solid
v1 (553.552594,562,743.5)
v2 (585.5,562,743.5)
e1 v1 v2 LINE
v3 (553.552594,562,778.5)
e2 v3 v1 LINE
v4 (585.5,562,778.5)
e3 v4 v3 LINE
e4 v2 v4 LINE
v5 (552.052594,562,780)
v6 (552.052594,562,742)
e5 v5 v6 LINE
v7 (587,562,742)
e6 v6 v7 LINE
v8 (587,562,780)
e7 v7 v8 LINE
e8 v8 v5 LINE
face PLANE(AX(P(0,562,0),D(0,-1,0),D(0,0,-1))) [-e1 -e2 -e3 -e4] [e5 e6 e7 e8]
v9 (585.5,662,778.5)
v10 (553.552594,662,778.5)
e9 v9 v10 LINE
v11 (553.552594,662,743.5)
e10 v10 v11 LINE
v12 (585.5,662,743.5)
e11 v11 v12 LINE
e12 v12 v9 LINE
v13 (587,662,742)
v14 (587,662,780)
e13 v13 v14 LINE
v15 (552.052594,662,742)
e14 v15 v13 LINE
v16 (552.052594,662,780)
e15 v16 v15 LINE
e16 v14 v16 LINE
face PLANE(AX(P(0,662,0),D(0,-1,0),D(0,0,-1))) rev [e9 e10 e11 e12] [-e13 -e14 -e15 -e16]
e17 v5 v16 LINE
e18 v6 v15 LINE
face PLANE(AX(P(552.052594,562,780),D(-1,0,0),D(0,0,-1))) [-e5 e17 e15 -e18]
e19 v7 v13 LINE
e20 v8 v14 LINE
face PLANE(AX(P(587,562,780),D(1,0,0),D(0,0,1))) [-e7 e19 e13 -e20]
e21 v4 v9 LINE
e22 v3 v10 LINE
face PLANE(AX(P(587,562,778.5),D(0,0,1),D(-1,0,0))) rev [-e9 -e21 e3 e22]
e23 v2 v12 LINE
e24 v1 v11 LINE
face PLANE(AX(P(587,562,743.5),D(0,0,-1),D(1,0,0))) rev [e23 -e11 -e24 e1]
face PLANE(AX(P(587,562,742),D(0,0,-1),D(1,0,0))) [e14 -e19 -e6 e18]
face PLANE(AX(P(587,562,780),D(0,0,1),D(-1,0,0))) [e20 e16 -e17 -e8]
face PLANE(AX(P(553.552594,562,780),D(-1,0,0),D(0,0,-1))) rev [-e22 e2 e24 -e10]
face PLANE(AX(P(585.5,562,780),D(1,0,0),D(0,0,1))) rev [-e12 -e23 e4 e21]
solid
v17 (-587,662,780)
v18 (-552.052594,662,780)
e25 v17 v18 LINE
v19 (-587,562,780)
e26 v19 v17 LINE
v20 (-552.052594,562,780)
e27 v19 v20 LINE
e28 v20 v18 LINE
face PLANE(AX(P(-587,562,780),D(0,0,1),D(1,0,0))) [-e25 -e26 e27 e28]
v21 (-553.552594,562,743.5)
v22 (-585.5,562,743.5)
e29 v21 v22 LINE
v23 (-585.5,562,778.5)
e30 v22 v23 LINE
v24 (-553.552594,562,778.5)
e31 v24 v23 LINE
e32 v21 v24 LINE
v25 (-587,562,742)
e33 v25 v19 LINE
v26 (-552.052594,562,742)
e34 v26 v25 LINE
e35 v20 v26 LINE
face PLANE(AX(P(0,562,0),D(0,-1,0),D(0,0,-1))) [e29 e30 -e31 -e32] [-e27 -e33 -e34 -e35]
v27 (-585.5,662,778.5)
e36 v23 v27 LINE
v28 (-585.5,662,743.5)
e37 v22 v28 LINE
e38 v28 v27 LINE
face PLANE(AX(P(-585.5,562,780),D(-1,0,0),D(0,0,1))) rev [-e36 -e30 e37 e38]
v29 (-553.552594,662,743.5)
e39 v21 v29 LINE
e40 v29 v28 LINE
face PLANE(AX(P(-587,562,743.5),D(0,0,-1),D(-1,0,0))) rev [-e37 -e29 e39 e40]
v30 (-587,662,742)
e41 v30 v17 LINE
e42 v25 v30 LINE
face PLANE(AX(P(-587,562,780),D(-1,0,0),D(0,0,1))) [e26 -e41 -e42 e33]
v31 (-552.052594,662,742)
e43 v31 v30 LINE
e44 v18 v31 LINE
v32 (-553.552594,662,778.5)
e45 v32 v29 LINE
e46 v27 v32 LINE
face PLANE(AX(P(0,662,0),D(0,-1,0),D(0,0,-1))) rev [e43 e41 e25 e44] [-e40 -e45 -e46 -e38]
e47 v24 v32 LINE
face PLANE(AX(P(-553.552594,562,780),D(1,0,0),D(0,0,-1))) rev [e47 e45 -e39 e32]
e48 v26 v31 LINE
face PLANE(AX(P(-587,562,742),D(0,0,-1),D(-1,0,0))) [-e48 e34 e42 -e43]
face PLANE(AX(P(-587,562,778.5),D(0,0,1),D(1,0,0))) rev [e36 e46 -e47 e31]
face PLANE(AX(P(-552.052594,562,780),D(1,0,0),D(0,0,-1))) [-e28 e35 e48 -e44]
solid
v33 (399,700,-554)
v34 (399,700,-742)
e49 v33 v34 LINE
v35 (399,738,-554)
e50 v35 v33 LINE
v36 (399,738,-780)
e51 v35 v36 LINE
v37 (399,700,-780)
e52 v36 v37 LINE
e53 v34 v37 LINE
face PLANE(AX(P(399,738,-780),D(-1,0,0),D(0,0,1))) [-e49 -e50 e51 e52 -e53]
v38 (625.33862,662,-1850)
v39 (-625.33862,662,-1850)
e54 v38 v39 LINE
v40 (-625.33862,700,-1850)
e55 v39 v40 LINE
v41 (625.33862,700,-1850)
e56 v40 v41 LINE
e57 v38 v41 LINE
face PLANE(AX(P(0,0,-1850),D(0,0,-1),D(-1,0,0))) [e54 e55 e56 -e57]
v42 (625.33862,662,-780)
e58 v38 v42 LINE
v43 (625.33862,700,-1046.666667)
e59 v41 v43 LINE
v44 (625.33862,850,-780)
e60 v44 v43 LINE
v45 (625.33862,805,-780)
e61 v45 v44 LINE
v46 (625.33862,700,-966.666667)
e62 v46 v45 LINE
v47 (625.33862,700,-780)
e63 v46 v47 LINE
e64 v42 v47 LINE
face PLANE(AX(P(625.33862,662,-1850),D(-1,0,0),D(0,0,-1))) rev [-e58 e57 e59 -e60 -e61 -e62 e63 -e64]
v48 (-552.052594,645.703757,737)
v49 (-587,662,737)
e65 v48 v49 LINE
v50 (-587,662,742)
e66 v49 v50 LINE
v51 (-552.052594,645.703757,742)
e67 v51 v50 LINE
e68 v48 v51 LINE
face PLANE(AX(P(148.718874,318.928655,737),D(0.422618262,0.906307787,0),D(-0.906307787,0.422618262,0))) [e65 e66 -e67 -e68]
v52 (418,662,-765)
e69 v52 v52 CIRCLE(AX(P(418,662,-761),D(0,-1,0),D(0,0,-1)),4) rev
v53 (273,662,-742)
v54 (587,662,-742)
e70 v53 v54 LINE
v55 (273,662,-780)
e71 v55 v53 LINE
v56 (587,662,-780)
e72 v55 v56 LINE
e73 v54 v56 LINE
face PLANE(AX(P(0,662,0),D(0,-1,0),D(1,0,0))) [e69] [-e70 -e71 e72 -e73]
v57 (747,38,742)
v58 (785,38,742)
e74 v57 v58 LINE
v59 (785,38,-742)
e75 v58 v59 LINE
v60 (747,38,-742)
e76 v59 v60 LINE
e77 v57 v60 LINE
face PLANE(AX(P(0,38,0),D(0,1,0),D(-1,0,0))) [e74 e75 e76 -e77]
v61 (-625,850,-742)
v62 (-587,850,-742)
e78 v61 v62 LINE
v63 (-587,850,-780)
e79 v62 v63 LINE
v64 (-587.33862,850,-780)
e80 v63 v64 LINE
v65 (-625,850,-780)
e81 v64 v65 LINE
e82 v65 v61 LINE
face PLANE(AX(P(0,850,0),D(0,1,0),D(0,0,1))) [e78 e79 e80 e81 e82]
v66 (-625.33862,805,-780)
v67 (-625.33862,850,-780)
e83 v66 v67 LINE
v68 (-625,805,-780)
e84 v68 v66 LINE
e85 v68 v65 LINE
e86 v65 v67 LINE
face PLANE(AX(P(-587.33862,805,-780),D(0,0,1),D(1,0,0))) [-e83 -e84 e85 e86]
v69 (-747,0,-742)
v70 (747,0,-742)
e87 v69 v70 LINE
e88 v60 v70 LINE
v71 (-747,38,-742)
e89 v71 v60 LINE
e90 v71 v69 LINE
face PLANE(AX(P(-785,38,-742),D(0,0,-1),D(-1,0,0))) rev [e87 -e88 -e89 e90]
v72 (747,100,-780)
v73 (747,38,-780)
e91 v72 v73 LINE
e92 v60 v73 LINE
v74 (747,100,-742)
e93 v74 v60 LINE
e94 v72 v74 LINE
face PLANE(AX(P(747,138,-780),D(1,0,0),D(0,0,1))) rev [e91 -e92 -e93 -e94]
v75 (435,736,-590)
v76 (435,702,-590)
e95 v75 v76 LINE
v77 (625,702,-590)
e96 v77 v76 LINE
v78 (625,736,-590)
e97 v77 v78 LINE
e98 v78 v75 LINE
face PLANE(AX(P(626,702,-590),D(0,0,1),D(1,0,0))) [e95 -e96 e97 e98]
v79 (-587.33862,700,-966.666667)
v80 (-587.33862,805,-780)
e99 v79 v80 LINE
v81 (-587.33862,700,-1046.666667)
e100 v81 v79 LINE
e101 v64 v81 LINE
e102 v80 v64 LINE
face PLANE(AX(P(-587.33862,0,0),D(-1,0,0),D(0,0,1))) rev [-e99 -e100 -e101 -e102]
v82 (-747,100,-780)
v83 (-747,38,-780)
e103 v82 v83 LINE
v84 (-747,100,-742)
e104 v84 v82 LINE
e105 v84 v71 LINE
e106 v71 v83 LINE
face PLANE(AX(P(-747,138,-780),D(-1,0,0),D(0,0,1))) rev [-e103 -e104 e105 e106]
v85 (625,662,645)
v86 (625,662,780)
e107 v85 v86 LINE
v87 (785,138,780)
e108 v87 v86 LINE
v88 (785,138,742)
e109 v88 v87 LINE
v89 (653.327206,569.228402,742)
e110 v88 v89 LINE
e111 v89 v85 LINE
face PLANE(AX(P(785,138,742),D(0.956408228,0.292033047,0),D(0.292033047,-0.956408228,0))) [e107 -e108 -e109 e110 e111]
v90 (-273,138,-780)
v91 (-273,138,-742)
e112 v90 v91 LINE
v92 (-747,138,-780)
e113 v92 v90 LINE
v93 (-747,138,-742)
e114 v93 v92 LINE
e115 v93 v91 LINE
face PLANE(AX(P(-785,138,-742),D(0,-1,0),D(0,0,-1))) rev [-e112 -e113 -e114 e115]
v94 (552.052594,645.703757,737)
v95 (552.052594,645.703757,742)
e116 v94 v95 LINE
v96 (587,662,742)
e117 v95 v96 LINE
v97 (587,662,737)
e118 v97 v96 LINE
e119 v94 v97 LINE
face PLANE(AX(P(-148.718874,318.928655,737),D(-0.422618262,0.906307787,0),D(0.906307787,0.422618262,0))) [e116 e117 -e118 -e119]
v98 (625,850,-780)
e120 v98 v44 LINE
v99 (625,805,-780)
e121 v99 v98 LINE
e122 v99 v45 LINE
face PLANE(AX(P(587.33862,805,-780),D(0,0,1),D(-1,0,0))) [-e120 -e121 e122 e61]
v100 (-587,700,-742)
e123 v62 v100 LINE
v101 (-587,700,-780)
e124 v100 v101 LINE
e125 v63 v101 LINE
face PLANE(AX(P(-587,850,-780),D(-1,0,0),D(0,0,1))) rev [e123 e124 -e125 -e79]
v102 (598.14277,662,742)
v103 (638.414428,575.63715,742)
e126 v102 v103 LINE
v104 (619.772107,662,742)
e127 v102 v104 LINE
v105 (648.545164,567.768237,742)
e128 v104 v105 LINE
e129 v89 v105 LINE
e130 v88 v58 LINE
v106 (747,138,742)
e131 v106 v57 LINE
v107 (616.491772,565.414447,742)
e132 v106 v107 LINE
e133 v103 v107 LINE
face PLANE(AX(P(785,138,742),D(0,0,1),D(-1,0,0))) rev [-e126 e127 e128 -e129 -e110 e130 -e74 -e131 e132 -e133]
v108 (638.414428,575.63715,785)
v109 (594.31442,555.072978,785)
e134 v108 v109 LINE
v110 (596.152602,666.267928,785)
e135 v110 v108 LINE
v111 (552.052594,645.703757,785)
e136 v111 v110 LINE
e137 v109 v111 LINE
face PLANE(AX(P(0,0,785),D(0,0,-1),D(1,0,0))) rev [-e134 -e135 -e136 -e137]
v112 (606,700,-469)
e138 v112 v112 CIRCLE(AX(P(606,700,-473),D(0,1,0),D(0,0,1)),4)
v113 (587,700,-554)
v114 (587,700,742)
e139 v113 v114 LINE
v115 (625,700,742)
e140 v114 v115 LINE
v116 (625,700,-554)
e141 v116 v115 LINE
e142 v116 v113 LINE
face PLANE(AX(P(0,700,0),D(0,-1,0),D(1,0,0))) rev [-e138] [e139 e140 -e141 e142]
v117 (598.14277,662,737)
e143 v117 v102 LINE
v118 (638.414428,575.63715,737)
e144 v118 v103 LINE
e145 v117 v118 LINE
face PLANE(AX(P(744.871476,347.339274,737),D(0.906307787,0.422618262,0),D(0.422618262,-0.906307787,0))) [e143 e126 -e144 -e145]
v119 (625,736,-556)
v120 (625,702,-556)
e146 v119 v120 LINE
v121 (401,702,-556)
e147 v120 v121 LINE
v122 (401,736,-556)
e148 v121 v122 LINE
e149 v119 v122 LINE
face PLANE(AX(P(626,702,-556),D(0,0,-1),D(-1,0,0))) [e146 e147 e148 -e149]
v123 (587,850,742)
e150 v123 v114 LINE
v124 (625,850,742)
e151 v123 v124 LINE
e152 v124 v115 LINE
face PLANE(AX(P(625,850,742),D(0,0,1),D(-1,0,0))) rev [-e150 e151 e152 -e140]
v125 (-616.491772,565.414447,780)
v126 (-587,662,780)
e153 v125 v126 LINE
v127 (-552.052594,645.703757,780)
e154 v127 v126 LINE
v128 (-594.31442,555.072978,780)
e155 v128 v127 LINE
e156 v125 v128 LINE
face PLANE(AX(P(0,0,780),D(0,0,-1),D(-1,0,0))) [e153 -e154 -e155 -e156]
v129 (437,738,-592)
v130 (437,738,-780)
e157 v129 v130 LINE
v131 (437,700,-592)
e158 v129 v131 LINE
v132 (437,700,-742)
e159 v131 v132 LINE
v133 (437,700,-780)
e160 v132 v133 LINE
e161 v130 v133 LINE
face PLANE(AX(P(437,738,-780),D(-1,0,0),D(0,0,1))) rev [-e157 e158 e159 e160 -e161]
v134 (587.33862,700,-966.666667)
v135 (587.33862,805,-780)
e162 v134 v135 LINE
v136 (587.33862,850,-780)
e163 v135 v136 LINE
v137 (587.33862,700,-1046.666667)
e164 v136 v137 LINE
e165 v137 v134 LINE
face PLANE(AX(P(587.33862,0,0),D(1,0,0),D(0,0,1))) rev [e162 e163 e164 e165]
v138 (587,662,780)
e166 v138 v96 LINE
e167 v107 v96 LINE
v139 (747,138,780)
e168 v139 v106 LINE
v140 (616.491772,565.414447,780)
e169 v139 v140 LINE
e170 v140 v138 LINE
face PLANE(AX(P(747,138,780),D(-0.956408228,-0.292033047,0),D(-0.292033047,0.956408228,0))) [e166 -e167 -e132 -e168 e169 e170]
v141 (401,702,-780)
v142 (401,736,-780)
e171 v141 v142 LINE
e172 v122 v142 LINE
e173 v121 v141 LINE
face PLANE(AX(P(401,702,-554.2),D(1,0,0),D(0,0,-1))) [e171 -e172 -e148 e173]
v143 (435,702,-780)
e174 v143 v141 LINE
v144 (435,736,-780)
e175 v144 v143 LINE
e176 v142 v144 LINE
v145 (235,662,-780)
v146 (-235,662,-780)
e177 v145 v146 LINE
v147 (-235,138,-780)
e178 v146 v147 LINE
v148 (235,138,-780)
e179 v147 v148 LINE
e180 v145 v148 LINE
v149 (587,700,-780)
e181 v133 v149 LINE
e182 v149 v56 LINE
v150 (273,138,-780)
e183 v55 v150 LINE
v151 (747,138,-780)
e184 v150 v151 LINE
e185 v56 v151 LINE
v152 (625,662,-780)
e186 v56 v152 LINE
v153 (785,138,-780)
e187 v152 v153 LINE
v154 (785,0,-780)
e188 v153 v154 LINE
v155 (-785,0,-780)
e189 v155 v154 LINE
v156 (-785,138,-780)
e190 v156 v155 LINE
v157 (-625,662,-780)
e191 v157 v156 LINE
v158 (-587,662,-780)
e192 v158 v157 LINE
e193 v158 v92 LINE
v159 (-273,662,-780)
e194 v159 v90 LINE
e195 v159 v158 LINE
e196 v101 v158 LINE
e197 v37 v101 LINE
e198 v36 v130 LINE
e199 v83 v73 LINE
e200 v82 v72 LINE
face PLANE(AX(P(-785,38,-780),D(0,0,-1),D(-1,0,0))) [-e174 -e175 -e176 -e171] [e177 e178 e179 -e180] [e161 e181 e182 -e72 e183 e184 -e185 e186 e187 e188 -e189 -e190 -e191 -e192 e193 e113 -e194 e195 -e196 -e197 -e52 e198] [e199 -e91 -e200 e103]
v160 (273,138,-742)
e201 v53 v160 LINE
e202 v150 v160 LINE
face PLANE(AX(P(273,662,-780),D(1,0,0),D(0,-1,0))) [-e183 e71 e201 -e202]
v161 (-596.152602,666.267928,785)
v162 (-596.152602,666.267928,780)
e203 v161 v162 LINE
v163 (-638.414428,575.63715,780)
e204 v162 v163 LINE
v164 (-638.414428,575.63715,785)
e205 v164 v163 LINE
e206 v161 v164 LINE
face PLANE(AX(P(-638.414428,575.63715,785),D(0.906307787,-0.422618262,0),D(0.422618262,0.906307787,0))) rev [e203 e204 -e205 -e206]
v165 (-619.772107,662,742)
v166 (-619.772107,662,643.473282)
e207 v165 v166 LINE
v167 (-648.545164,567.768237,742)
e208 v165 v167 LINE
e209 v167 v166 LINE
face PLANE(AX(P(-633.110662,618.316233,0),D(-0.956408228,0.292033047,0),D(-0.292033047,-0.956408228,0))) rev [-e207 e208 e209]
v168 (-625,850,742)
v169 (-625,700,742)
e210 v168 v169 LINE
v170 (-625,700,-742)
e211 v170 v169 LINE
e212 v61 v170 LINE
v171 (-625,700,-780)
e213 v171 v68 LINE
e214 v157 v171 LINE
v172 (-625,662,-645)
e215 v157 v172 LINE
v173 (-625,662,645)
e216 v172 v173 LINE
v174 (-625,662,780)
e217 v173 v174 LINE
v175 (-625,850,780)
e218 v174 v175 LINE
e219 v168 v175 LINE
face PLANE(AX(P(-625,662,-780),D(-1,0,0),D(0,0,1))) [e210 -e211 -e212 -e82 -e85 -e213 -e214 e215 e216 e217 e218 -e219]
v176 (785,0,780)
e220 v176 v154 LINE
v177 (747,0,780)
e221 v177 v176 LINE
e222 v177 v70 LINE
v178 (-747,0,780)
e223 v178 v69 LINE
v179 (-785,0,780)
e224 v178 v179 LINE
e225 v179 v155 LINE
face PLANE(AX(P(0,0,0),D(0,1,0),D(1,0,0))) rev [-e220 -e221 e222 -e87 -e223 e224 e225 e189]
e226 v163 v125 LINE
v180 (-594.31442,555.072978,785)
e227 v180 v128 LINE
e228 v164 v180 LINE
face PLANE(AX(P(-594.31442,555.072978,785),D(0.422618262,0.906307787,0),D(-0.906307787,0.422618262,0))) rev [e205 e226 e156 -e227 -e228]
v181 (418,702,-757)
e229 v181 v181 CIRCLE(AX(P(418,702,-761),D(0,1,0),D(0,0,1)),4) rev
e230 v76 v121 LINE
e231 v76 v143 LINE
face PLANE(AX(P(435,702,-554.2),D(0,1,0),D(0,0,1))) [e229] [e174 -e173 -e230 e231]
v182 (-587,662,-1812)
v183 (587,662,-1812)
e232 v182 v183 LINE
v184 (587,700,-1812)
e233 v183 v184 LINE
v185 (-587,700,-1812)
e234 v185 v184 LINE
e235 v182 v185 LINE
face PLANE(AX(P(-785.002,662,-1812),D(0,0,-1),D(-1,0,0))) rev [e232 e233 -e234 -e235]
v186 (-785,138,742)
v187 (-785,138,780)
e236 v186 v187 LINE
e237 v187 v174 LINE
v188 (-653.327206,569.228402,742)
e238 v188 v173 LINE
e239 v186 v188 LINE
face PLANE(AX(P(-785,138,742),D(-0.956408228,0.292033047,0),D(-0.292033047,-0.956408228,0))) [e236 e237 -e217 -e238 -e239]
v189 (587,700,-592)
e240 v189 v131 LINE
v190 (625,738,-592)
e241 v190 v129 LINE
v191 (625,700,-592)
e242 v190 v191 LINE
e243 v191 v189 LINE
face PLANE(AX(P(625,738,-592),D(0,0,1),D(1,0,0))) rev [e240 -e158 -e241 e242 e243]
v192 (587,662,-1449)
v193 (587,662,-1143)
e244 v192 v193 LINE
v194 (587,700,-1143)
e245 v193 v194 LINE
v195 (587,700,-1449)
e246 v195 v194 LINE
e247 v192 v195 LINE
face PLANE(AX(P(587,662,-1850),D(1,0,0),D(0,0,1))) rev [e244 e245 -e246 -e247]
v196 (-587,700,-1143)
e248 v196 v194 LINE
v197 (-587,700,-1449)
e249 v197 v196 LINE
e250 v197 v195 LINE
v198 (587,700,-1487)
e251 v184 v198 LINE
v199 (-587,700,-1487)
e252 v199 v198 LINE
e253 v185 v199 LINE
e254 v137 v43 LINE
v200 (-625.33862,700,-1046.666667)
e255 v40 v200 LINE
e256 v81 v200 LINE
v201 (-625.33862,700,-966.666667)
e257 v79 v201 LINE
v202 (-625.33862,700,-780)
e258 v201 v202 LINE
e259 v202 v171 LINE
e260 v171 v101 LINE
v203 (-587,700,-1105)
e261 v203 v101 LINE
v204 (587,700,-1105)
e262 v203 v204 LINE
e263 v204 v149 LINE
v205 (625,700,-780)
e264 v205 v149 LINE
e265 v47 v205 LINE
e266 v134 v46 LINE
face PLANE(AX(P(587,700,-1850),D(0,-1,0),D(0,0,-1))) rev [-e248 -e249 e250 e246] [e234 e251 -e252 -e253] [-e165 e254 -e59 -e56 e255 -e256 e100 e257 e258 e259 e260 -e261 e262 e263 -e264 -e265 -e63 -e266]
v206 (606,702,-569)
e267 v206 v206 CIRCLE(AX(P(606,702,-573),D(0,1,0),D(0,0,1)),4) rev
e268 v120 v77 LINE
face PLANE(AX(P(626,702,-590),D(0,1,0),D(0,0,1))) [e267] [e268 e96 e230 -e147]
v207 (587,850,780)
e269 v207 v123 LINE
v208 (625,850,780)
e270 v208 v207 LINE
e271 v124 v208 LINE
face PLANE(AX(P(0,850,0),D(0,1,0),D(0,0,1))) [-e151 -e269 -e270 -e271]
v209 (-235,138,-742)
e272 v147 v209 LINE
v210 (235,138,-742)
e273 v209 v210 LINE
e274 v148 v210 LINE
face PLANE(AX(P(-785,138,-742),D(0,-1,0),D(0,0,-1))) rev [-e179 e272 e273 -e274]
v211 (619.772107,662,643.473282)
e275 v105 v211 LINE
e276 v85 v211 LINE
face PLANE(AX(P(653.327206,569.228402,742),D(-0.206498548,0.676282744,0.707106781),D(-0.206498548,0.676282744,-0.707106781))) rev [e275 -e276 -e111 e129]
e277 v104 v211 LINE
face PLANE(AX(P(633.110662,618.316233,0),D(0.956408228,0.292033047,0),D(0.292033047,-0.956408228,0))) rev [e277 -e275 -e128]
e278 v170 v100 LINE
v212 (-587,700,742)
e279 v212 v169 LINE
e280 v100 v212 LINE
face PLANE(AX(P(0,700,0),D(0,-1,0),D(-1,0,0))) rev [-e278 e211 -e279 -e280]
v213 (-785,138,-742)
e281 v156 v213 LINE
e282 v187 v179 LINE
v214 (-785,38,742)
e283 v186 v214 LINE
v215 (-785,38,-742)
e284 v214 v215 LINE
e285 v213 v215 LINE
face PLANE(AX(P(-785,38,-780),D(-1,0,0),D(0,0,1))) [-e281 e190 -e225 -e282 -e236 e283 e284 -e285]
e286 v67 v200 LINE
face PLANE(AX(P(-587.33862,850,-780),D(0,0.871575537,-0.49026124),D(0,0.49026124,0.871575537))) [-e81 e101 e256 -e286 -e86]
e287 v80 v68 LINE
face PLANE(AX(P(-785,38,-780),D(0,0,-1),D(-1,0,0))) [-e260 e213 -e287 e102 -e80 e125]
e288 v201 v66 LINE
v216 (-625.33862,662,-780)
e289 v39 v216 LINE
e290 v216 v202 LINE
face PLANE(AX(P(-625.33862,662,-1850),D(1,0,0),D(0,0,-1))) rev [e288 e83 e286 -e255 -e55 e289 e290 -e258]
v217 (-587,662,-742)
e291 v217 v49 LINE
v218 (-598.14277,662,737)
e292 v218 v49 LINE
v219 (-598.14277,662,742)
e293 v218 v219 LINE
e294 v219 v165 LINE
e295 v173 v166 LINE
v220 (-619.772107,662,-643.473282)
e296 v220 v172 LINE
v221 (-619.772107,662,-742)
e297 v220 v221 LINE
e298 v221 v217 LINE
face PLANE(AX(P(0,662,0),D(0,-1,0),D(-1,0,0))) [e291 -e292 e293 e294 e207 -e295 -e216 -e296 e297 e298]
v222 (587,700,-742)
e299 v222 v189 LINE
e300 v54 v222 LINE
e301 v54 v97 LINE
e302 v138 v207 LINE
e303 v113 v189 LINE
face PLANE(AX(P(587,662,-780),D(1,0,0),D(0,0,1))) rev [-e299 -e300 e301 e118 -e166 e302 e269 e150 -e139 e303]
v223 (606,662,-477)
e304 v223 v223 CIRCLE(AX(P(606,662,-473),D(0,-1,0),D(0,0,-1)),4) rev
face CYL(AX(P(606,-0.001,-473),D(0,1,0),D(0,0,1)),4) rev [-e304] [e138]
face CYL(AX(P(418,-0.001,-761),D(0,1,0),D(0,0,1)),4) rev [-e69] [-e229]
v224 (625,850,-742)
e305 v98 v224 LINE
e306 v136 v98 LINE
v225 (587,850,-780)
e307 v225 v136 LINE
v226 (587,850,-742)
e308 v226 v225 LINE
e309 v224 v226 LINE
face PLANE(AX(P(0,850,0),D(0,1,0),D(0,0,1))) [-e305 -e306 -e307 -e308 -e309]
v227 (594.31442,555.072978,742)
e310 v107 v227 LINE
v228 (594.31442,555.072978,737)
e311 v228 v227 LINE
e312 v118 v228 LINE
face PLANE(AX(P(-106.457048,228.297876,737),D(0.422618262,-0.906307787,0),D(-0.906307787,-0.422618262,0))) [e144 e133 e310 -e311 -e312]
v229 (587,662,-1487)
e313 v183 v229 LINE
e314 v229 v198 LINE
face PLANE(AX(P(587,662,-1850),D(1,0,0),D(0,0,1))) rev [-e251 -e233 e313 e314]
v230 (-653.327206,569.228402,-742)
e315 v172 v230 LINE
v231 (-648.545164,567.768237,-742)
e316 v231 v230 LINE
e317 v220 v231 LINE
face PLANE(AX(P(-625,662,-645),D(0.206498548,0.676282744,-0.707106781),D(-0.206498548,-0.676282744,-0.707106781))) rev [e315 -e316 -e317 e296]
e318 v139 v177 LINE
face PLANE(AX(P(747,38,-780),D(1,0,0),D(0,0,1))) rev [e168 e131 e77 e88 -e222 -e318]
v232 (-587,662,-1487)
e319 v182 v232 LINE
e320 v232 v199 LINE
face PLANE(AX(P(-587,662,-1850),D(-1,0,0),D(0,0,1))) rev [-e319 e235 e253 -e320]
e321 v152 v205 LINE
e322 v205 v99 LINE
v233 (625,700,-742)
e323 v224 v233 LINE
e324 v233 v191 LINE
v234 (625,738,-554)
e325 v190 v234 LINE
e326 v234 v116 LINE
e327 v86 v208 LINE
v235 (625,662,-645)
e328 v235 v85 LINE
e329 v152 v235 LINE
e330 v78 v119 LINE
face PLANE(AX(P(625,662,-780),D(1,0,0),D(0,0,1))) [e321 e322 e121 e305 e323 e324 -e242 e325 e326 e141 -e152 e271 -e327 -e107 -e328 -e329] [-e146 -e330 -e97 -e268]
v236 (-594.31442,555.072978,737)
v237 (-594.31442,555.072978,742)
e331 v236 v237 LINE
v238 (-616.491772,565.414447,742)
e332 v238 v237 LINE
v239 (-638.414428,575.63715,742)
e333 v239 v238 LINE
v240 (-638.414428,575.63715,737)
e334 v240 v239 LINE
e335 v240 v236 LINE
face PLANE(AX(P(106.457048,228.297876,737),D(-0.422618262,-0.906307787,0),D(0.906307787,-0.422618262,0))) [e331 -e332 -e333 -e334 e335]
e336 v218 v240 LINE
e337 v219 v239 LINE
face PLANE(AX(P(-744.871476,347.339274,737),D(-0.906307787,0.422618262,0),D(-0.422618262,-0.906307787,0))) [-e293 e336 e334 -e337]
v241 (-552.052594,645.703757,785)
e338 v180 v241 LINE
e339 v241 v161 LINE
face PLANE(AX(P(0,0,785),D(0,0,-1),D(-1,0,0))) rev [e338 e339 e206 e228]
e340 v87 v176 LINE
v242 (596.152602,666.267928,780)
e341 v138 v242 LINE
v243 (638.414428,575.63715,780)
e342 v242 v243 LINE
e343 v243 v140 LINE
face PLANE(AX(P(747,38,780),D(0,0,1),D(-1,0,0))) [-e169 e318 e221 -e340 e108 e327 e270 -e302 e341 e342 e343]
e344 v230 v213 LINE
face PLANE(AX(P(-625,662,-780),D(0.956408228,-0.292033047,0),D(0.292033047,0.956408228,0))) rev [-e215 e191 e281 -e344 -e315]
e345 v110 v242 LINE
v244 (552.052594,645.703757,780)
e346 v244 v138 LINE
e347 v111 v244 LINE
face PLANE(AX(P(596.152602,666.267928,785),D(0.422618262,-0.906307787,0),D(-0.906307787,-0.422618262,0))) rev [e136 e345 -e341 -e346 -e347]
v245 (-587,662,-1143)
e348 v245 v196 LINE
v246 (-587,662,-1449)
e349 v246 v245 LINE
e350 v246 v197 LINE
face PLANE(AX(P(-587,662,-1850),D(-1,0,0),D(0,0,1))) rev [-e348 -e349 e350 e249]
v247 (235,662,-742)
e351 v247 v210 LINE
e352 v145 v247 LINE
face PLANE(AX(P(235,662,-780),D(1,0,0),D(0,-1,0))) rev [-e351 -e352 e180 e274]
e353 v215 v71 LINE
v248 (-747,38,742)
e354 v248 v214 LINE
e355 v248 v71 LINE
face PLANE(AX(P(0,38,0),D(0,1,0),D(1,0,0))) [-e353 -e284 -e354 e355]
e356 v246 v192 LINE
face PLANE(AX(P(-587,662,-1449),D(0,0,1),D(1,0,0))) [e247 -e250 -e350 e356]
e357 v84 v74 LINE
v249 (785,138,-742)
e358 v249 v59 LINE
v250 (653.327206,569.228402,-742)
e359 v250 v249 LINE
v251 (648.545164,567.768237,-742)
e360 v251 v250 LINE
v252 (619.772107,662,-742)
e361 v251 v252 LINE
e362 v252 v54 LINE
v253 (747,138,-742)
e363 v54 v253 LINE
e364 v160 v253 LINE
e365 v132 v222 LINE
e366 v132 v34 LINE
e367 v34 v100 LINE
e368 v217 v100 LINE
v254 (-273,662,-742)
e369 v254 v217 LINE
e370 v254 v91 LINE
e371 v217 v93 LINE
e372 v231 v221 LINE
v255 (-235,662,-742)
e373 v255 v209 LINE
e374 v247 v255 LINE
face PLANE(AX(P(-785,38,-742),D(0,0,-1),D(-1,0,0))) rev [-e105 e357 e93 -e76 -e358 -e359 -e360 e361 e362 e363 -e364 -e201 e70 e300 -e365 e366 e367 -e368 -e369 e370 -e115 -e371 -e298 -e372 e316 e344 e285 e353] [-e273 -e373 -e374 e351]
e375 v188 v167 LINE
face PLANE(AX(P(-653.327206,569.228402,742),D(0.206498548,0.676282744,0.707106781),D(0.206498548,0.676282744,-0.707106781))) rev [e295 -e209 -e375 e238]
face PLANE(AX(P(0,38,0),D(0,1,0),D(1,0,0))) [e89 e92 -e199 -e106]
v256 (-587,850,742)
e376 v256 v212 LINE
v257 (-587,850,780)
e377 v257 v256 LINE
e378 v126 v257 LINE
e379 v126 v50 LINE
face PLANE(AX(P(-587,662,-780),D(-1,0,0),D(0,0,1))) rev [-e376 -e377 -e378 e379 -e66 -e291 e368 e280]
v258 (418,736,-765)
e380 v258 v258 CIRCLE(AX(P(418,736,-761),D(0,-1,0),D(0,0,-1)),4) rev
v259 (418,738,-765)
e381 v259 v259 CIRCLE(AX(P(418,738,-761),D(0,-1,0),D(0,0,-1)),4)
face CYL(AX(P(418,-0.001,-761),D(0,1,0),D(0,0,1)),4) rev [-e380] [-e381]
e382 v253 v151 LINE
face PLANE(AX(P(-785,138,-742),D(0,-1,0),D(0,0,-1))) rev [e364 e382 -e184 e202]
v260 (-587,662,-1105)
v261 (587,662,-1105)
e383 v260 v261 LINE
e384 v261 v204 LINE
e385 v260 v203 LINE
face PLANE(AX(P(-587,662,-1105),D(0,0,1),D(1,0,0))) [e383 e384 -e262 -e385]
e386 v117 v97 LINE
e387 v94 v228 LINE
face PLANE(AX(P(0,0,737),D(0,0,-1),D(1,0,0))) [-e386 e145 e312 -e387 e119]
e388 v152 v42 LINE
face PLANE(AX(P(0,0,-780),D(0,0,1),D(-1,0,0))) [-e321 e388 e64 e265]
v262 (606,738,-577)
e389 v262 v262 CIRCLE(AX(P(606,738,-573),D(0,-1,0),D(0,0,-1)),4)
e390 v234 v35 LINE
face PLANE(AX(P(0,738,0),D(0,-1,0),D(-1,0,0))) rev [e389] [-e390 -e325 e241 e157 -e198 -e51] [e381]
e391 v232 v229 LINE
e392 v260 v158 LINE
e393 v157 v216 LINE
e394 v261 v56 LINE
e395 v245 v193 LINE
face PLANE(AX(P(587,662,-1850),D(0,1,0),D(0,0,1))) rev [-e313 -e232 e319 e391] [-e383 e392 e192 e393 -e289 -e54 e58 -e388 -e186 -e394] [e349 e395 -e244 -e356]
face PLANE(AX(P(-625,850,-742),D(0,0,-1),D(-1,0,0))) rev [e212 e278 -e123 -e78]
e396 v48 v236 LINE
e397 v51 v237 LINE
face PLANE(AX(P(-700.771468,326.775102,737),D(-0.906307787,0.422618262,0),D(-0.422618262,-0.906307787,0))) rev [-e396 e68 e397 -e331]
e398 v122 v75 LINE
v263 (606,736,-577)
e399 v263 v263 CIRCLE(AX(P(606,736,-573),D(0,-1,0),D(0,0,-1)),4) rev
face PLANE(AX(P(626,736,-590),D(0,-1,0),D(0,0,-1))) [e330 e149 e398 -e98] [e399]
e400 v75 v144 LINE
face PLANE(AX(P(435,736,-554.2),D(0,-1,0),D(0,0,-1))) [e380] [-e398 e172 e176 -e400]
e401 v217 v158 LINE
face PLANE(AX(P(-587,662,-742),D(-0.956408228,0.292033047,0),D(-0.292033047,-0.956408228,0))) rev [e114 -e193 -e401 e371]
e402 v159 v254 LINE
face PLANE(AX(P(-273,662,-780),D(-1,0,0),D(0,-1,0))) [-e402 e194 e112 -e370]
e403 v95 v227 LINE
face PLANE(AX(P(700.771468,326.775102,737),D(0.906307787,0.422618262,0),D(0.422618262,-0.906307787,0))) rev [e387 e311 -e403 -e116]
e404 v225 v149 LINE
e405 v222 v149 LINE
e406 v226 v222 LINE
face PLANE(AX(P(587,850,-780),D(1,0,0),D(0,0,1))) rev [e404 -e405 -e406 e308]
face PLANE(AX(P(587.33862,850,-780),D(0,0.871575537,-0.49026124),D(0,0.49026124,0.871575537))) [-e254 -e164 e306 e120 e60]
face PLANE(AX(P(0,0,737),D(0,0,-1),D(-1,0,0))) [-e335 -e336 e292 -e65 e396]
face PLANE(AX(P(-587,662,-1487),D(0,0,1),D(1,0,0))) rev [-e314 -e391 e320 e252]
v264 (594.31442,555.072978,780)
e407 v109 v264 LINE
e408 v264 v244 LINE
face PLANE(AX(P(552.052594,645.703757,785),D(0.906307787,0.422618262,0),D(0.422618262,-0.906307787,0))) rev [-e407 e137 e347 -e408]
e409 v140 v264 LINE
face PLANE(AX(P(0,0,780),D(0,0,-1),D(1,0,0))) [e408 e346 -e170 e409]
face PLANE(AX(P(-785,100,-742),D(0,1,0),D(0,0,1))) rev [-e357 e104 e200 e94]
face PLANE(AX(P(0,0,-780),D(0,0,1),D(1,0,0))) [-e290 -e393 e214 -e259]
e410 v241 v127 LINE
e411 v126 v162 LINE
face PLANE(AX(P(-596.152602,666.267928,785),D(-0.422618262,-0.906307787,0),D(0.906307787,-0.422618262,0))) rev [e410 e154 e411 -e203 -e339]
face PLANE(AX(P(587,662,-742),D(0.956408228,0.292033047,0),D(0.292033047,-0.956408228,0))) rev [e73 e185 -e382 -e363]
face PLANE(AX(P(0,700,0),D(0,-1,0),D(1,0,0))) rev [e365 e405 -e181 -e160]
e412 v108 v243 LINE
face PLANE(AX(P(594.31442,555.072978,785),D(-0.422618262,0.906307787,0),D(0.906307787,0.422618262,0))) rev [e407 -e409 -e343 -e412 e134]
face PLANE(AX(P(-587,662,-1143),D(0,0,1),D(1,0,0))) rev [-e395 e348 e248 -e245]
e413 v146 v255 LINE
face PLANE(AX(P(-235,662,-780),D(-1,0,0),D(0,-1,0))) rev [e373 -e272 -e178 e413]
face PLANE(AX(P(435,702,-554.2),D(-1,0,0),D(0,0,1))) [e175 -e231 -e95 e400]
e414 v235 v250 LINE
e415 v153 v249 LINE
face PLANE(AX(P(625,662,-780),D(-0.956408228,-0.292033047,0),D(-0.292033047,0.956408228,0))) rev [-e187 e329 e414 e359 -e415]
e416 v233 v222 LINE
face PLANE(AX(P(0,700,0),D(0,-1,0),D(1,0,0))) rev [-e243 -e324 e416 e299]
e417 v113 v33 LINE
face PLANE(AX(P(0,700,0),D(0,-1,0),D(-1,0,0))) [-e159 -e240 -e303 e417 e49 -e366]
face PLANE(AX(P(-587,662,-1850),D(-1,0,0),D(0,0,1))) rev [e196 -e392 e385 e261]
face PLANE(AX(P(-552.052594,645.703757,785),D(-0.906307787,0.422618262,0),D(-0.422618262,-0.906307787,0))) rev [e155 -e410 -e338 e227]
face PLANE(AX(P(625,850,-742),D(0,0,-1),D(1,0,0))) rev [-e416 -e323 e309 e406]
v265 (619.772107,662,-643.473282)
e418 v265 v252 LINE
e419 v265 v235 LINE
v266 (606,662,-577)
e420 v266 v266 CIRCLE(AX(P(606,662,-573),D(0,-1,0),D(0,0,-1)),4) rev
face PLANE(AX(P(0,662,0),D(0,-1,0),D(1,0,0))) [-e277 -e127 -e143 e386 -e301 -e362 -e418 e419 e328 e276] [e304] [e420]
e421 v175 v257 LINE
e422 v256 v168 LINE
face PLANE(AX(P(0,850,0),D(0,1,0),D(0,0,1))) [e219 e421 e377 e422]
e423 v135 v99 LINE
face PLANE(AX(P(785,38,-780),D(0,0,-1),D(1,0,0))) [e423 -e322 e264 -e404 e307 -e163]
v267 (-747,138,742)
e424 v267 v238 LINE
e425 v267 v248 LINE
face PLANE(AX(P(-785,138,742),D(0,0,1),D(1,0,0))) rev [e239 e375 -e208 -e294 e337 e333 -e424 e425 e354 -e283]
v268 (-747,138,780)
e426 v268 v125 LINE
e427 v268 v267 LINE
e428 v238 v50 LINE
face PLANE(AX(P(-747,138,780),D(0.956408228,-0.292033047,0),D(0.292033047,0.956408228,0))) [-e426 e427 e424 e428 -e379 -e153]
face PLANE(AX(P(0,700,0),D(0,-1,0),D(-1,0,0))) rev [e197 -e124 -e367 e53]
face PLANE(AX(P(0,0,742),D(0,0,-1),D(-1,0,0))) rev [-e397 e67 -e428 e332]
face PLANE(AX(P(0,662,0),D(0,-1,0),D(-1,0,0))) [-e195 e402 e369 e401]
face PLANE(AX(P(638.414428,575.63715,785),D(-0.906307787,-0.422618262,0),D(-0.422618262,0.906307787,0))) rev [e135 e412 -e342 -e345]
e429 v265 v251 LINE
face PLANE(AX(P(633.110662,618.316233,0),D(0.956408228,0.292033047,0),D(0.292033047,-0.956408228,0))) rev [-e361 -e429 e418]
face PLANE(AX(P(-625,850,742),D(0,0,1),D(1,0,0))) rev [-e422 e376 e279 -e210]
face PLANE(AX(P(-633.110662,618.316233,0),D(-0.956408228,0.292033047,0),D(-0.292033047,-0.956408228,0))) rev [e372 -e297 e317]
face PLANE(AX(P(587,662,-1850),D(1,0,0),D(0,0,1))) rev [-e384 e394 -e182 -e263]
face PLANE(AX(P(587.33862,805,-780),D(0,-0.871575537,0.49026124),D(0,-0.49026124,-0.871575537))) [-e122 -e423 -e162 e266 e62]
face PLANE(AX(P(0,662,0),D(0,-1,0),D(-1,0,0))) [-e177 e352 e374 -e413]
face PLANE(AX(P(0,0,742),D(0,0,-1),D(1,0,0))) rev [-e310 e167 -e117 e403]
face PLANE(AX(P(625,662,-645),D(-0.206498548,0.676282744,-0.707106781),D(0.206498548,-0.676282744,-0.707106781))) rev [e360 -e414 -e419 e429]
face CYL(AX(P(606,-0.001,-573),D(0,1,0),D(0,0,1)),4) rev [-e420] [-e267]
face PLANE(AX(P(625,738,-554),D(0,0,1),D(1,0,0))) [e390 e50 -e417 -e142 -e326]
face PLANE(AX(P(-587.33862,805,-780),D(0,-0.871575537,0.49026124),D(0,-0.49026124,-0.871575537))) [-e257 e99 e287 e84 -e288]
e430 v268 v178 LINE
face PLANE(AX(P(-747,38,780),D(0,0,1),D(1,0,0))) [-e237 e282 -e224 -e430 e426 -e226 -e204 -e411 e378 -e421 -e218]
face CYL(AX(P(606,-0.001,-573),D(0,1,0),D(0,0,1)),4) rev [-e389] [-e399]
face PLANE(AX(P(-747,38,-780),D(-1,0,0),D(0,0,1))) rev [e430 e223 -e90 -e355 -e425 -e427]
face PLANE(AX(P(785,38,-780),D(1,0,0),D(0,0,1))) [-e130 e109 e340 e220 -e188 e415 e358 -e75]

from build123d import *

# Parameters (mm, degrees)
EXTRUDE_THIN1_DEPTH  = 38
SKETCH3_W            = 38
SKETCH3_H            = 38
BOSS_EXTRUDE1_DEPTH  = 100
EXTRUDE_THIN2_DEPTH  = 38
SWEEP1_START         = 742
SWEEP1_DEPTH         = 38
SWEEP2_START         = 742
SWEEP2_DEPTH         = 38
SWEEP3_START         = -780
SWEEP3_DEPTH         = 38
SWEEP4_START         = -780
SWEEP4_DEPTH         = 38
SKETCH13_W           = 38
SKETCH13_H           = 38
BOSS_EXTRUDE2_DEPTH  = 150
RIB1_REACH           = 1837.226
SKETCH16_WALL_W      = 3809.630165696
SKETCH16_WALL_H      = 5
RIB2_REACH           = 1837.226
SKETCH21_WALL_W      = 3809.630165696
SKETCH21_WALL_H      = 5
SKETCH25_W           = 935.216872936
SKETCH25_H           = 953.548523314
CUT_EXTRUDE1_DEPTH   = 1943.247409575
SKETCH26_W           = 38
SKETCH26_H           = 38
SKETCH26_W_2         = 38.33862028
BOSS_EXTRUDE3_DEPTH  = 1070
BOSS_EXTRUDE4_REACH  = 2457.073
SKETCH27_W           = 38
SKETCH27_H           = 38
BOSS_EXTRUDE5_DEPTH  = 38
SKETCH29_W           = 38
SKETCH29_H           = 624
EXTRUDE_THIN3_DEPTH  = 38
SKETCH30_W           = 38
SKETCH30_H           = 624
EXTRUDE_THIN4_DEPTH  = 38
SKETCH31_W           = 1174
SKETCH31_H           = 38
EXTRUDE_THIN5_DEPTH  = 38
BOSS_EXTRUDE6_DEPTH  = 38
BOSS_EXTRUDE7_DEPTH  = 5
BOSS_EXTRUDE8_DEPTH  = 5
SKETCH35_W           = 34.947405688
SKETCH35_H           = 38
BOSS_EXTRUDE11_DEPTH = 100
SHELL1_T             = -1.5
SKETCH36_W           = 943.118643106
SKETCH36_H           = 1032.640089362
CUT_EXTRUDE2_DEPTH   = 2878.837729963
SKETCH38_R           = 4
CUT_EXTRUDE3_DEPTH   = 38
SKETCH40_W           = 31.947405688
SKETCH40_H           = 35
CUT_EXTRUDE5_DEPTH   = 2087.760407905
SKETCH41_W           = 31.947405688
SKETCH41_H           = 35
CUT_EXTRUDE6_DEPTH   = 2087.760407905
EXTRUDE_THIN7_DEPTH  = 38
SKETCH43_R           = 4
CUT_EXTRUDE7_DEPTH   = 2116.884921256
SKETCH45_W           = 34
SKETCH45_H           = 34
SKETCH49_W           = 38
SKETCH49_H           = 38
BOSS_EXTRUDE12_DEPTH = 1494
SKETCH50_W           = 38
SKETCH50_H           = 62
CUT_EXTRUDE8_DEPTH   = 1916.842895438


# Read off the part's stored shape, not the designer's step: Sweep1, Sweep2, Sweep3, Sweep4
with BuildPart() as part:
    # Sketch2 → Extrude-Thin1 (new body)
    with BuildSketch(Plane(origin=(0, 0, 0), x_dir=(1, 0, 0), z_dir=(0, 1, 0))):
        Polygon((785, -780), (785, 780), (-785, 780), (-785, -780), (-747, -780), (-747, 742), (747, 742), (747, -780), align=None)
    extrude(amount=EXTRUDE_THIN1_DEPTH)

    # Sketch3 → Boss-Extrude1 (add)
    with BuildSketch(Plane(origin=(0, 38, 0), x_dir=(1, 0, 0), z_dir=(0, 1, 0))):
        with Locations((-766, 761)):
            Rectangle(SKETCH3_W, SKETCH3_H)
        with Locations((766, 761)):
            Rectangle(SKETCH3_W, SKETCH3_H)
        with Locations((766, -761)):
            Rectangle(SKETCH3_W, SKETCH3_H)
        with Locations((-766, -761)):
            Rectangle(SKETCH3_W, SKETCH3_H)
    extrude(amount=BOSS_EXTRUDE1_DEPTH)



with BuildPart() as body_2:
    # Sketch4 → Extrude-Thin2 (new body)
    with BuildSketch(Plane(origin=(0, 700, 0), x_dir=(1, 0, 0), z_dir=(0, 1, 0))):
        Polygon((625, -780), (625, 780), (-625, 780), (-625, -780), (-587, -780), (-587, 742), (587, 742), (587, -780), align=None)
    extrude(amount=-EXTRUDE_THIN2_DEPTH)


with BuildPart() as part_1:
    add(part.part)

    add(body_2.part)  # Sweep1 merges body 2
    # Sweep1 outline → Sweep1 (add)
    with BuildSketch(Plane.XY.offset(SWEEP1_START)):
        Polygon((-587, 662), (-625, 662), (-785, 138), (-747, 138), align=None)
    extrude(amount=SWEEP1_DEPTH)

    # Sweep2 outline → Sweep2 (add)
    with BuildSketch(Plane.XY.offset(SWEEP2_START)):
        Polygon((747, 138), (785, 138), (625, 662), (587, 662), align=None)
    extrude(amount=SWEEP2_DEPTH)

    # Sweep3 outline → Sweep3 (add)
    with BuildSketch(Plane.XY.offset(SWEEP3_START)):
        Polygon((785, 138), (625, 662), (587, 662), (747, 138), align=None)
    extrude(amount=SWEEP3_DEPTH)

    # Sweep4 outline → Sweep4 (add)
    with BuildSketch(Plane.XY.offset(SWEEP4_START)):
        Polygon((-625, 662), (-785, 138), (-747, 138), (-587, 662), align=None)
    extrude(amount=SWEEP4_DEPTH)

    # Sketch13 → Boss-Extrude2 (add)
    with BuildSketch(Plane(origin=(0, 700, 0), x_dir=(1, 0, 0), z_dir=(0, 1, 0))):
        with Locations((-606, 761)):
            Rectangle(SKETCH13_W, SKETCH13_H)
        with Locations((-606, -761)):
            Rectangle(SKETCH13_W, SKETCH13_H)
        with Locations((606, 761)):
            Rectangle(SKETCH13_W, SKETCH13_H)
        with Locations((606, -761)):
            Rectangle(SKETCH13_W, SKETCH13_H)
    extrude(amount=BOSS_EXTRUDE2_DEPTH)

    # Sketch16 wall → Rib1 (add, up to next)
    with BuildSketch(Plane(origin=(-639.163602773, 615.614200918, 693.5), x_dir=(0.20649854777, 0.676282743952, -0.707106781188), z_dir=(-0.206498547772, -0.676282743954, -0.707106781186)), mode=Mode.PRIVATE) as rib1_sk1:
        with Locations((0, 2.5)):
            Rectangle(SKETCH16_WALL_W, SKETCH16_WALL_H)
    rib1_tool1 = extrude(rib1_sk1.sketch, amount=-RIB1_REACH, mode=Mode.PRIVATE) - part_1.part
    add(rib1_tool1.solids().sort_by_distance((-639.163602773, 615.614200918, 693.5))[0])

    # Sketch21 wall → Rib2 (add, up to next)
    with BuildSketch(Plane(origin=(-639.163602773, 615.614200918, -693.5), x_dir=(-0.20649854777, -0.676282743952, -0.707106781188), z_dir=(-0.206498547772, -0.676282743954, 0.707106781186)), mode=Mode.PRIVATE) as rib2_sk1:
        with Locations((0, 2.5)):
            Rectangle(SKETCH21_WALL_W, SKETCH21_WALL_H)
    rib2_tool1 = extrude(rib2_sk1.sketch, amount=-RIB2_REACH, mode=Mode.PRIVATE) - part_1.part
    add(rib2_tool1.solids().sort_by_distance((-639.163602773, 615.614200918, -693.5))[0])

    # Sketch25 → Cut-Extrude1 (cut, through all)
    with BuildSketch(Plane.XY.offset(780)):
        with Locations((467.608436468, 476.774261657)):
            Rectangle(SKETCH25_W, SKETCH25_H)
    extrude(amount=-CUT_EXTRUDE1_DEPTH, mode=Mode.SUBTRACT)

    # Mirror12: part across plane


with BuildPart() as part_2:
    add(part_1.part)
    add(part_1.part.mirror(Plane(origin=(0, 0, -780), x_dir=(0, 0, 1), z_dir=(-1, 0, 0))))

    # Sketch26 → Boss-Extrude3 (add)
    with BuildSketch(Plane(origin=(0, 0, -780), x_dir=(-1, 0, 0), z_dir=(0, 0, -1))):
        with Locations((-606, 681)):
            Rectangle(SKETCH26_W, SKETCH26_H)
        with Locations((606.16931014, 681)):
            Rectangle(SKETCH26_W_2, SKETCH26_H)
    extrude(amount=BOSS_EXTRUDE3_DEPTH)

    # Sketch27 → Boss-Extrude4 (add, up to next)
    with BuildSketch(Plane.ZY.offset(-587), mode=Mode.PRIVATE) as boss_extrude4_sk1:
        with Locations((-1831, 681)):
            Rectangle(SKETCH27_W, SKETCH27_H)
    boss_extrude4_tool1 = extrude(boss_extrude4_sk1.sketch, amount=BOSS_EXTRUDE4_REACH, mode=Mode.PRIVATE) - part_2.part
    add(boss_extrude4_tool1.solids().sort_by_distance((587, 681, -1831))[0])

    # Sketch28 → Boss-Extrude5 (add)
    with BuildSketch(Plane.ZY.offset(625.33862028)):
        Polygon((-780, 850), (-1046.666666667, 700), (-966.666666667, 700), (-780, 805), align=None)
    extrude(amount=-BOSS_EXTRUDE5_DEPTH)

    # Sketch29 → Extrude-Thin3 (add)
    with BuildSketch(Plane.XY.offset(-742)):
        with Locations((-254, 350)):
            Rectangle(SKETCH29_W, SKETCH29_H)
    extrude(amount=-EXTRUDE_THIN3_DEPTH)

    # Sketch31 → Extrude-Thin5 (add)
    with BuildSketch(Plane(origin=(0, 700, 0), x_dir=(1, 0, 0), z_dir=(0, 1, 0))):
        with Locations((0, 1468)):
            Rectangle(SKETCH31_W, SKETCH31_H)
        with Locations((0, 1124)):
            Rectangle(SKETCH31_W, SKETCH31_H)
    extrude(amount=-EXTRUDE_THIN5_DEPTH)

    # Sketch32 → Boss-Extrude6 (add)
    with BuildSketch(Plane(origin=(625, 0, 0), x_dir=(0, 0, -1), z_dir=(1, 0, 0))):
        Polygon((1046.666666667, 700), (780, 850), (780, 805), (966.666666667, 700), align=None)
    extrude(amount=-BOSS_EXTRUDE6_DEPTH)

    # Sketch33 → Boss-Extrude7 (add)
    with BuildSketch(Plane.XY.offset(780)):
        Polygon((-596.152601999, 666.267928404), (-552.052594312, 645.703757095), (-594.314420486, 555.072978391), (-638.414428173, 575.637149701), align=None)
    extrude(amount=BOSS_EXTRUDE7_DEPTH)

    # Sketch34 → Boss-Extrude8 (add)
    with BuildSketch(Plane(origin=(0, 0, 742), x_dir=(-1, 0, 0), z_dir=(0, 0, -1))):
        Polygon((594.314420486, 555.072978391), (616.491771856, 565.414447173), (587, 662), (552.052594312, 645.703757095), align=None)
        Polygon((616.491771856, 565.414447173), (638.414428173, 575.637149701), (598.142769699, 662), (587, 662), align=None)
    extrude(amount=BOSS_EXTRUDE8_DEPTH)


with BuildPart() as body_2_2:
    # Sketch30 → Extrude-Thin4 (new body)
    with BuildSketch(Plane.XY.offset(-742)):
        with Locations((254, 350)):
            Rectangle(SKETCH30_W, SKETCH30_H)
    extrude(amount=-EXTRUDE_THIN4_DEPTH)


with BuildPart() as body_3:
    # Sketch35 → Boss-Extrude11 (new body)
    with BuildSketch(Plane(origin=(0, 662, 0), x_dir=(1, 0, 0), z_dir=(0, 1, 0))):
        with Locations((-569.526297156, -761)):
            Rectangle(SKETCH35_W, SKETCH35_H)
    extrude(amount=-BOSS_EXTRUDE11_DEPTH)

    # Shell1
    shell1_openings = [body_3.faces().sort_by_distance(p)[0] for p in [
        (-569.526297156, 662, 761),
    ]]
    offset(amount=SHELL1_T, openings=shell1_openings, kind=Kind.INTERSECTION)


with BuildPart() as cut_extrude2_tool:
    # Sketch36 → Cut-Extrude2 (new, through all)
    with BuildSketch(Plane.XY.offset(785)):
        with Locations((471.559321553, 516.320044681)):
            Rectangle(SKETCH36_W, SKETCH36_H)
    extrude(amount=-CUT_EXTRUDE2_DEPTH)


with BuildPart() as part_3:
    add(part_2.part)

    # Cut-Extrude2: cut by cut_extrude2_tool
    add(cut_extrude2_tool.part, mode=Mode.SUBTRACT)


with BuildPart() as body_2_2_1:
    add(body_2_2.part)

    # Cut-Extrude2: cut by cut_extrude2_tool
    add(cut_extrude2_tool.part, mode=Mode.SUBTRACT)


with BuildPart() as body_3_2:
    # Mirror13: mirrored copy
    add(part_3.part.mirror(Plane(origin=(0, 0, -1850), x_dir=(0, 0, 1), z_dir=(-1, 0, 0))))

    # Sketch38 → Cut-Extrude3 (cut)
    with BuildSketch(Plane(origin=(0, 700, 0), x_dir=(1, 0, 0), z_dir=(0, 1, 0))):
        with Locations(Location((418, 761, 0), (0, 0, 270))):
            Circle(SKETCH38_R)
        with Locations(Location((606, 573, 0), (0, 0, 270))):
            Circle(SKETCH38_R)
        with Locations(Location((606, 473, 0), (0, 0, 270))):
            Circle(SKETCH38_R)
    extrude(amount=-CUT_EXTRUDE3_DEPTH, mode=Mode.SUBTRACT)

    # Sketch42 → Extrude-Thin7 (add)
    with BuildSketch(Plane(origin=(0, 700, 0), x_dir=(1, 0, 0), z_dir=(0, 1, 0))):
        Polygon((399, 780), (399, 554), (625, 554), (625, 592), (437, 592), (437, 780), align=None)
    extrude(amount=EXTRUDE_THIN7_DEPTH)

    # Sketch43 → Cut-Extrude7 (cut, through all)
    with BuildSketch(Plane.XZ.offset(-662)):
        with Locations(Location((606, -573, 0), (0, 0, 270))):
            Circle(SKETCH43_R)
        with Locations(Location((418, -761, 0), (0, 0, 270))):
            Circle(SKETCH43_R)
    extrude(amount=-CUT_EXTRUDE7_DEPTH, mode=Mode.SUBTRACT)

    # Cut-Sweep3: sweep along a path in Sketch48
    with BuildLine(Plane(origin=(0, 712.5, 0), x_dir=(1, 0, 0), z_dir=(0, 1, 0))) as cut_sweep3_path:
        Line((625, 573), (418, 573))
        Line((418, 573), (418, 780))
    # Sketch45 → Cut-Sweep3 (sweep, cut)
    with BuildSketch(Plane(origin=(625, 0, 0), x_dir=(0, 0, -1), z_dir=(1, 0, 0))):
        with Locations((573, 719)):
            Rectangle(SKETCH45_W, SKETCH45_H)
    sweep(path=cut_sweep3_path.line, transition=Transition.RIGHT, mode=Mode.SUBTRACT)


with BuildPart() as body_4:
    # Mirror13 2: mirrored copy
    add(body_3.part.mirror(Plane(origin=(0, 0, -1850), x_dir=(0, 0, 1), z_dir=(-1, 0, 0))))

    # Sketch41 → Cut-Extrude6 (cut, through all)
    with BuildSketch(Plane.XZ.offset(-562)):
        with Locations((569.526297156, 761)):
            Rectangle(SKETCH41_W, SKETCH41_H)
    extrude(amount=-CUT_EXTRUDE6_DEPTH, mode=Mode.SUBTRACT)


with BuildPart() as body_3_1:
    add(body_3.part)

    # Sketch40 → Cut-Extrude5 (cut, through all)
    with BuildSketch(Plane.XZ.offset(-562)):
        with Locations((-569.526297156, 761)):
            Rectangle(SKETCH40_W, SKETCH40_H)
    extrude(amount=-CUT_EXTRUDE5_DEPTH, mode=Mode.SUBTRACT)


with BuildPart() as part_4:
    add(part_3.part)

    add(body_3_2.part)  # Boss-Extrude12 merges body 3 2
    # Sketch49 → Boss-Extrude12 (add)
    with BuildSketch(Plane.ZY.offset(-747)):
        with Locations((-761, 119)):
            Rectangle(SKETCH49_W, SKETCH49_H)
    extrude(amount=BOSS_EXTRUDE12_DEPTH)

    # Sketch50 → Cut-Extrude8 (cut, through all)
    with BuildSketch(Plane.XY.offset(-742)):
        with Locations((-254, 69)):
            Rectangle(SKETCH50_W, SKETCH50_H)
        with Locations((254, 69)):
            Rectangle(SKETCH50_W, SKETCH50_H)
    extrude(amount=-CUT_EXTRUDE8_DEPTH, mode=Mode.SUBTRACT)


solid = Compound([body_4.part, body_3_1.part, part_4.part])
